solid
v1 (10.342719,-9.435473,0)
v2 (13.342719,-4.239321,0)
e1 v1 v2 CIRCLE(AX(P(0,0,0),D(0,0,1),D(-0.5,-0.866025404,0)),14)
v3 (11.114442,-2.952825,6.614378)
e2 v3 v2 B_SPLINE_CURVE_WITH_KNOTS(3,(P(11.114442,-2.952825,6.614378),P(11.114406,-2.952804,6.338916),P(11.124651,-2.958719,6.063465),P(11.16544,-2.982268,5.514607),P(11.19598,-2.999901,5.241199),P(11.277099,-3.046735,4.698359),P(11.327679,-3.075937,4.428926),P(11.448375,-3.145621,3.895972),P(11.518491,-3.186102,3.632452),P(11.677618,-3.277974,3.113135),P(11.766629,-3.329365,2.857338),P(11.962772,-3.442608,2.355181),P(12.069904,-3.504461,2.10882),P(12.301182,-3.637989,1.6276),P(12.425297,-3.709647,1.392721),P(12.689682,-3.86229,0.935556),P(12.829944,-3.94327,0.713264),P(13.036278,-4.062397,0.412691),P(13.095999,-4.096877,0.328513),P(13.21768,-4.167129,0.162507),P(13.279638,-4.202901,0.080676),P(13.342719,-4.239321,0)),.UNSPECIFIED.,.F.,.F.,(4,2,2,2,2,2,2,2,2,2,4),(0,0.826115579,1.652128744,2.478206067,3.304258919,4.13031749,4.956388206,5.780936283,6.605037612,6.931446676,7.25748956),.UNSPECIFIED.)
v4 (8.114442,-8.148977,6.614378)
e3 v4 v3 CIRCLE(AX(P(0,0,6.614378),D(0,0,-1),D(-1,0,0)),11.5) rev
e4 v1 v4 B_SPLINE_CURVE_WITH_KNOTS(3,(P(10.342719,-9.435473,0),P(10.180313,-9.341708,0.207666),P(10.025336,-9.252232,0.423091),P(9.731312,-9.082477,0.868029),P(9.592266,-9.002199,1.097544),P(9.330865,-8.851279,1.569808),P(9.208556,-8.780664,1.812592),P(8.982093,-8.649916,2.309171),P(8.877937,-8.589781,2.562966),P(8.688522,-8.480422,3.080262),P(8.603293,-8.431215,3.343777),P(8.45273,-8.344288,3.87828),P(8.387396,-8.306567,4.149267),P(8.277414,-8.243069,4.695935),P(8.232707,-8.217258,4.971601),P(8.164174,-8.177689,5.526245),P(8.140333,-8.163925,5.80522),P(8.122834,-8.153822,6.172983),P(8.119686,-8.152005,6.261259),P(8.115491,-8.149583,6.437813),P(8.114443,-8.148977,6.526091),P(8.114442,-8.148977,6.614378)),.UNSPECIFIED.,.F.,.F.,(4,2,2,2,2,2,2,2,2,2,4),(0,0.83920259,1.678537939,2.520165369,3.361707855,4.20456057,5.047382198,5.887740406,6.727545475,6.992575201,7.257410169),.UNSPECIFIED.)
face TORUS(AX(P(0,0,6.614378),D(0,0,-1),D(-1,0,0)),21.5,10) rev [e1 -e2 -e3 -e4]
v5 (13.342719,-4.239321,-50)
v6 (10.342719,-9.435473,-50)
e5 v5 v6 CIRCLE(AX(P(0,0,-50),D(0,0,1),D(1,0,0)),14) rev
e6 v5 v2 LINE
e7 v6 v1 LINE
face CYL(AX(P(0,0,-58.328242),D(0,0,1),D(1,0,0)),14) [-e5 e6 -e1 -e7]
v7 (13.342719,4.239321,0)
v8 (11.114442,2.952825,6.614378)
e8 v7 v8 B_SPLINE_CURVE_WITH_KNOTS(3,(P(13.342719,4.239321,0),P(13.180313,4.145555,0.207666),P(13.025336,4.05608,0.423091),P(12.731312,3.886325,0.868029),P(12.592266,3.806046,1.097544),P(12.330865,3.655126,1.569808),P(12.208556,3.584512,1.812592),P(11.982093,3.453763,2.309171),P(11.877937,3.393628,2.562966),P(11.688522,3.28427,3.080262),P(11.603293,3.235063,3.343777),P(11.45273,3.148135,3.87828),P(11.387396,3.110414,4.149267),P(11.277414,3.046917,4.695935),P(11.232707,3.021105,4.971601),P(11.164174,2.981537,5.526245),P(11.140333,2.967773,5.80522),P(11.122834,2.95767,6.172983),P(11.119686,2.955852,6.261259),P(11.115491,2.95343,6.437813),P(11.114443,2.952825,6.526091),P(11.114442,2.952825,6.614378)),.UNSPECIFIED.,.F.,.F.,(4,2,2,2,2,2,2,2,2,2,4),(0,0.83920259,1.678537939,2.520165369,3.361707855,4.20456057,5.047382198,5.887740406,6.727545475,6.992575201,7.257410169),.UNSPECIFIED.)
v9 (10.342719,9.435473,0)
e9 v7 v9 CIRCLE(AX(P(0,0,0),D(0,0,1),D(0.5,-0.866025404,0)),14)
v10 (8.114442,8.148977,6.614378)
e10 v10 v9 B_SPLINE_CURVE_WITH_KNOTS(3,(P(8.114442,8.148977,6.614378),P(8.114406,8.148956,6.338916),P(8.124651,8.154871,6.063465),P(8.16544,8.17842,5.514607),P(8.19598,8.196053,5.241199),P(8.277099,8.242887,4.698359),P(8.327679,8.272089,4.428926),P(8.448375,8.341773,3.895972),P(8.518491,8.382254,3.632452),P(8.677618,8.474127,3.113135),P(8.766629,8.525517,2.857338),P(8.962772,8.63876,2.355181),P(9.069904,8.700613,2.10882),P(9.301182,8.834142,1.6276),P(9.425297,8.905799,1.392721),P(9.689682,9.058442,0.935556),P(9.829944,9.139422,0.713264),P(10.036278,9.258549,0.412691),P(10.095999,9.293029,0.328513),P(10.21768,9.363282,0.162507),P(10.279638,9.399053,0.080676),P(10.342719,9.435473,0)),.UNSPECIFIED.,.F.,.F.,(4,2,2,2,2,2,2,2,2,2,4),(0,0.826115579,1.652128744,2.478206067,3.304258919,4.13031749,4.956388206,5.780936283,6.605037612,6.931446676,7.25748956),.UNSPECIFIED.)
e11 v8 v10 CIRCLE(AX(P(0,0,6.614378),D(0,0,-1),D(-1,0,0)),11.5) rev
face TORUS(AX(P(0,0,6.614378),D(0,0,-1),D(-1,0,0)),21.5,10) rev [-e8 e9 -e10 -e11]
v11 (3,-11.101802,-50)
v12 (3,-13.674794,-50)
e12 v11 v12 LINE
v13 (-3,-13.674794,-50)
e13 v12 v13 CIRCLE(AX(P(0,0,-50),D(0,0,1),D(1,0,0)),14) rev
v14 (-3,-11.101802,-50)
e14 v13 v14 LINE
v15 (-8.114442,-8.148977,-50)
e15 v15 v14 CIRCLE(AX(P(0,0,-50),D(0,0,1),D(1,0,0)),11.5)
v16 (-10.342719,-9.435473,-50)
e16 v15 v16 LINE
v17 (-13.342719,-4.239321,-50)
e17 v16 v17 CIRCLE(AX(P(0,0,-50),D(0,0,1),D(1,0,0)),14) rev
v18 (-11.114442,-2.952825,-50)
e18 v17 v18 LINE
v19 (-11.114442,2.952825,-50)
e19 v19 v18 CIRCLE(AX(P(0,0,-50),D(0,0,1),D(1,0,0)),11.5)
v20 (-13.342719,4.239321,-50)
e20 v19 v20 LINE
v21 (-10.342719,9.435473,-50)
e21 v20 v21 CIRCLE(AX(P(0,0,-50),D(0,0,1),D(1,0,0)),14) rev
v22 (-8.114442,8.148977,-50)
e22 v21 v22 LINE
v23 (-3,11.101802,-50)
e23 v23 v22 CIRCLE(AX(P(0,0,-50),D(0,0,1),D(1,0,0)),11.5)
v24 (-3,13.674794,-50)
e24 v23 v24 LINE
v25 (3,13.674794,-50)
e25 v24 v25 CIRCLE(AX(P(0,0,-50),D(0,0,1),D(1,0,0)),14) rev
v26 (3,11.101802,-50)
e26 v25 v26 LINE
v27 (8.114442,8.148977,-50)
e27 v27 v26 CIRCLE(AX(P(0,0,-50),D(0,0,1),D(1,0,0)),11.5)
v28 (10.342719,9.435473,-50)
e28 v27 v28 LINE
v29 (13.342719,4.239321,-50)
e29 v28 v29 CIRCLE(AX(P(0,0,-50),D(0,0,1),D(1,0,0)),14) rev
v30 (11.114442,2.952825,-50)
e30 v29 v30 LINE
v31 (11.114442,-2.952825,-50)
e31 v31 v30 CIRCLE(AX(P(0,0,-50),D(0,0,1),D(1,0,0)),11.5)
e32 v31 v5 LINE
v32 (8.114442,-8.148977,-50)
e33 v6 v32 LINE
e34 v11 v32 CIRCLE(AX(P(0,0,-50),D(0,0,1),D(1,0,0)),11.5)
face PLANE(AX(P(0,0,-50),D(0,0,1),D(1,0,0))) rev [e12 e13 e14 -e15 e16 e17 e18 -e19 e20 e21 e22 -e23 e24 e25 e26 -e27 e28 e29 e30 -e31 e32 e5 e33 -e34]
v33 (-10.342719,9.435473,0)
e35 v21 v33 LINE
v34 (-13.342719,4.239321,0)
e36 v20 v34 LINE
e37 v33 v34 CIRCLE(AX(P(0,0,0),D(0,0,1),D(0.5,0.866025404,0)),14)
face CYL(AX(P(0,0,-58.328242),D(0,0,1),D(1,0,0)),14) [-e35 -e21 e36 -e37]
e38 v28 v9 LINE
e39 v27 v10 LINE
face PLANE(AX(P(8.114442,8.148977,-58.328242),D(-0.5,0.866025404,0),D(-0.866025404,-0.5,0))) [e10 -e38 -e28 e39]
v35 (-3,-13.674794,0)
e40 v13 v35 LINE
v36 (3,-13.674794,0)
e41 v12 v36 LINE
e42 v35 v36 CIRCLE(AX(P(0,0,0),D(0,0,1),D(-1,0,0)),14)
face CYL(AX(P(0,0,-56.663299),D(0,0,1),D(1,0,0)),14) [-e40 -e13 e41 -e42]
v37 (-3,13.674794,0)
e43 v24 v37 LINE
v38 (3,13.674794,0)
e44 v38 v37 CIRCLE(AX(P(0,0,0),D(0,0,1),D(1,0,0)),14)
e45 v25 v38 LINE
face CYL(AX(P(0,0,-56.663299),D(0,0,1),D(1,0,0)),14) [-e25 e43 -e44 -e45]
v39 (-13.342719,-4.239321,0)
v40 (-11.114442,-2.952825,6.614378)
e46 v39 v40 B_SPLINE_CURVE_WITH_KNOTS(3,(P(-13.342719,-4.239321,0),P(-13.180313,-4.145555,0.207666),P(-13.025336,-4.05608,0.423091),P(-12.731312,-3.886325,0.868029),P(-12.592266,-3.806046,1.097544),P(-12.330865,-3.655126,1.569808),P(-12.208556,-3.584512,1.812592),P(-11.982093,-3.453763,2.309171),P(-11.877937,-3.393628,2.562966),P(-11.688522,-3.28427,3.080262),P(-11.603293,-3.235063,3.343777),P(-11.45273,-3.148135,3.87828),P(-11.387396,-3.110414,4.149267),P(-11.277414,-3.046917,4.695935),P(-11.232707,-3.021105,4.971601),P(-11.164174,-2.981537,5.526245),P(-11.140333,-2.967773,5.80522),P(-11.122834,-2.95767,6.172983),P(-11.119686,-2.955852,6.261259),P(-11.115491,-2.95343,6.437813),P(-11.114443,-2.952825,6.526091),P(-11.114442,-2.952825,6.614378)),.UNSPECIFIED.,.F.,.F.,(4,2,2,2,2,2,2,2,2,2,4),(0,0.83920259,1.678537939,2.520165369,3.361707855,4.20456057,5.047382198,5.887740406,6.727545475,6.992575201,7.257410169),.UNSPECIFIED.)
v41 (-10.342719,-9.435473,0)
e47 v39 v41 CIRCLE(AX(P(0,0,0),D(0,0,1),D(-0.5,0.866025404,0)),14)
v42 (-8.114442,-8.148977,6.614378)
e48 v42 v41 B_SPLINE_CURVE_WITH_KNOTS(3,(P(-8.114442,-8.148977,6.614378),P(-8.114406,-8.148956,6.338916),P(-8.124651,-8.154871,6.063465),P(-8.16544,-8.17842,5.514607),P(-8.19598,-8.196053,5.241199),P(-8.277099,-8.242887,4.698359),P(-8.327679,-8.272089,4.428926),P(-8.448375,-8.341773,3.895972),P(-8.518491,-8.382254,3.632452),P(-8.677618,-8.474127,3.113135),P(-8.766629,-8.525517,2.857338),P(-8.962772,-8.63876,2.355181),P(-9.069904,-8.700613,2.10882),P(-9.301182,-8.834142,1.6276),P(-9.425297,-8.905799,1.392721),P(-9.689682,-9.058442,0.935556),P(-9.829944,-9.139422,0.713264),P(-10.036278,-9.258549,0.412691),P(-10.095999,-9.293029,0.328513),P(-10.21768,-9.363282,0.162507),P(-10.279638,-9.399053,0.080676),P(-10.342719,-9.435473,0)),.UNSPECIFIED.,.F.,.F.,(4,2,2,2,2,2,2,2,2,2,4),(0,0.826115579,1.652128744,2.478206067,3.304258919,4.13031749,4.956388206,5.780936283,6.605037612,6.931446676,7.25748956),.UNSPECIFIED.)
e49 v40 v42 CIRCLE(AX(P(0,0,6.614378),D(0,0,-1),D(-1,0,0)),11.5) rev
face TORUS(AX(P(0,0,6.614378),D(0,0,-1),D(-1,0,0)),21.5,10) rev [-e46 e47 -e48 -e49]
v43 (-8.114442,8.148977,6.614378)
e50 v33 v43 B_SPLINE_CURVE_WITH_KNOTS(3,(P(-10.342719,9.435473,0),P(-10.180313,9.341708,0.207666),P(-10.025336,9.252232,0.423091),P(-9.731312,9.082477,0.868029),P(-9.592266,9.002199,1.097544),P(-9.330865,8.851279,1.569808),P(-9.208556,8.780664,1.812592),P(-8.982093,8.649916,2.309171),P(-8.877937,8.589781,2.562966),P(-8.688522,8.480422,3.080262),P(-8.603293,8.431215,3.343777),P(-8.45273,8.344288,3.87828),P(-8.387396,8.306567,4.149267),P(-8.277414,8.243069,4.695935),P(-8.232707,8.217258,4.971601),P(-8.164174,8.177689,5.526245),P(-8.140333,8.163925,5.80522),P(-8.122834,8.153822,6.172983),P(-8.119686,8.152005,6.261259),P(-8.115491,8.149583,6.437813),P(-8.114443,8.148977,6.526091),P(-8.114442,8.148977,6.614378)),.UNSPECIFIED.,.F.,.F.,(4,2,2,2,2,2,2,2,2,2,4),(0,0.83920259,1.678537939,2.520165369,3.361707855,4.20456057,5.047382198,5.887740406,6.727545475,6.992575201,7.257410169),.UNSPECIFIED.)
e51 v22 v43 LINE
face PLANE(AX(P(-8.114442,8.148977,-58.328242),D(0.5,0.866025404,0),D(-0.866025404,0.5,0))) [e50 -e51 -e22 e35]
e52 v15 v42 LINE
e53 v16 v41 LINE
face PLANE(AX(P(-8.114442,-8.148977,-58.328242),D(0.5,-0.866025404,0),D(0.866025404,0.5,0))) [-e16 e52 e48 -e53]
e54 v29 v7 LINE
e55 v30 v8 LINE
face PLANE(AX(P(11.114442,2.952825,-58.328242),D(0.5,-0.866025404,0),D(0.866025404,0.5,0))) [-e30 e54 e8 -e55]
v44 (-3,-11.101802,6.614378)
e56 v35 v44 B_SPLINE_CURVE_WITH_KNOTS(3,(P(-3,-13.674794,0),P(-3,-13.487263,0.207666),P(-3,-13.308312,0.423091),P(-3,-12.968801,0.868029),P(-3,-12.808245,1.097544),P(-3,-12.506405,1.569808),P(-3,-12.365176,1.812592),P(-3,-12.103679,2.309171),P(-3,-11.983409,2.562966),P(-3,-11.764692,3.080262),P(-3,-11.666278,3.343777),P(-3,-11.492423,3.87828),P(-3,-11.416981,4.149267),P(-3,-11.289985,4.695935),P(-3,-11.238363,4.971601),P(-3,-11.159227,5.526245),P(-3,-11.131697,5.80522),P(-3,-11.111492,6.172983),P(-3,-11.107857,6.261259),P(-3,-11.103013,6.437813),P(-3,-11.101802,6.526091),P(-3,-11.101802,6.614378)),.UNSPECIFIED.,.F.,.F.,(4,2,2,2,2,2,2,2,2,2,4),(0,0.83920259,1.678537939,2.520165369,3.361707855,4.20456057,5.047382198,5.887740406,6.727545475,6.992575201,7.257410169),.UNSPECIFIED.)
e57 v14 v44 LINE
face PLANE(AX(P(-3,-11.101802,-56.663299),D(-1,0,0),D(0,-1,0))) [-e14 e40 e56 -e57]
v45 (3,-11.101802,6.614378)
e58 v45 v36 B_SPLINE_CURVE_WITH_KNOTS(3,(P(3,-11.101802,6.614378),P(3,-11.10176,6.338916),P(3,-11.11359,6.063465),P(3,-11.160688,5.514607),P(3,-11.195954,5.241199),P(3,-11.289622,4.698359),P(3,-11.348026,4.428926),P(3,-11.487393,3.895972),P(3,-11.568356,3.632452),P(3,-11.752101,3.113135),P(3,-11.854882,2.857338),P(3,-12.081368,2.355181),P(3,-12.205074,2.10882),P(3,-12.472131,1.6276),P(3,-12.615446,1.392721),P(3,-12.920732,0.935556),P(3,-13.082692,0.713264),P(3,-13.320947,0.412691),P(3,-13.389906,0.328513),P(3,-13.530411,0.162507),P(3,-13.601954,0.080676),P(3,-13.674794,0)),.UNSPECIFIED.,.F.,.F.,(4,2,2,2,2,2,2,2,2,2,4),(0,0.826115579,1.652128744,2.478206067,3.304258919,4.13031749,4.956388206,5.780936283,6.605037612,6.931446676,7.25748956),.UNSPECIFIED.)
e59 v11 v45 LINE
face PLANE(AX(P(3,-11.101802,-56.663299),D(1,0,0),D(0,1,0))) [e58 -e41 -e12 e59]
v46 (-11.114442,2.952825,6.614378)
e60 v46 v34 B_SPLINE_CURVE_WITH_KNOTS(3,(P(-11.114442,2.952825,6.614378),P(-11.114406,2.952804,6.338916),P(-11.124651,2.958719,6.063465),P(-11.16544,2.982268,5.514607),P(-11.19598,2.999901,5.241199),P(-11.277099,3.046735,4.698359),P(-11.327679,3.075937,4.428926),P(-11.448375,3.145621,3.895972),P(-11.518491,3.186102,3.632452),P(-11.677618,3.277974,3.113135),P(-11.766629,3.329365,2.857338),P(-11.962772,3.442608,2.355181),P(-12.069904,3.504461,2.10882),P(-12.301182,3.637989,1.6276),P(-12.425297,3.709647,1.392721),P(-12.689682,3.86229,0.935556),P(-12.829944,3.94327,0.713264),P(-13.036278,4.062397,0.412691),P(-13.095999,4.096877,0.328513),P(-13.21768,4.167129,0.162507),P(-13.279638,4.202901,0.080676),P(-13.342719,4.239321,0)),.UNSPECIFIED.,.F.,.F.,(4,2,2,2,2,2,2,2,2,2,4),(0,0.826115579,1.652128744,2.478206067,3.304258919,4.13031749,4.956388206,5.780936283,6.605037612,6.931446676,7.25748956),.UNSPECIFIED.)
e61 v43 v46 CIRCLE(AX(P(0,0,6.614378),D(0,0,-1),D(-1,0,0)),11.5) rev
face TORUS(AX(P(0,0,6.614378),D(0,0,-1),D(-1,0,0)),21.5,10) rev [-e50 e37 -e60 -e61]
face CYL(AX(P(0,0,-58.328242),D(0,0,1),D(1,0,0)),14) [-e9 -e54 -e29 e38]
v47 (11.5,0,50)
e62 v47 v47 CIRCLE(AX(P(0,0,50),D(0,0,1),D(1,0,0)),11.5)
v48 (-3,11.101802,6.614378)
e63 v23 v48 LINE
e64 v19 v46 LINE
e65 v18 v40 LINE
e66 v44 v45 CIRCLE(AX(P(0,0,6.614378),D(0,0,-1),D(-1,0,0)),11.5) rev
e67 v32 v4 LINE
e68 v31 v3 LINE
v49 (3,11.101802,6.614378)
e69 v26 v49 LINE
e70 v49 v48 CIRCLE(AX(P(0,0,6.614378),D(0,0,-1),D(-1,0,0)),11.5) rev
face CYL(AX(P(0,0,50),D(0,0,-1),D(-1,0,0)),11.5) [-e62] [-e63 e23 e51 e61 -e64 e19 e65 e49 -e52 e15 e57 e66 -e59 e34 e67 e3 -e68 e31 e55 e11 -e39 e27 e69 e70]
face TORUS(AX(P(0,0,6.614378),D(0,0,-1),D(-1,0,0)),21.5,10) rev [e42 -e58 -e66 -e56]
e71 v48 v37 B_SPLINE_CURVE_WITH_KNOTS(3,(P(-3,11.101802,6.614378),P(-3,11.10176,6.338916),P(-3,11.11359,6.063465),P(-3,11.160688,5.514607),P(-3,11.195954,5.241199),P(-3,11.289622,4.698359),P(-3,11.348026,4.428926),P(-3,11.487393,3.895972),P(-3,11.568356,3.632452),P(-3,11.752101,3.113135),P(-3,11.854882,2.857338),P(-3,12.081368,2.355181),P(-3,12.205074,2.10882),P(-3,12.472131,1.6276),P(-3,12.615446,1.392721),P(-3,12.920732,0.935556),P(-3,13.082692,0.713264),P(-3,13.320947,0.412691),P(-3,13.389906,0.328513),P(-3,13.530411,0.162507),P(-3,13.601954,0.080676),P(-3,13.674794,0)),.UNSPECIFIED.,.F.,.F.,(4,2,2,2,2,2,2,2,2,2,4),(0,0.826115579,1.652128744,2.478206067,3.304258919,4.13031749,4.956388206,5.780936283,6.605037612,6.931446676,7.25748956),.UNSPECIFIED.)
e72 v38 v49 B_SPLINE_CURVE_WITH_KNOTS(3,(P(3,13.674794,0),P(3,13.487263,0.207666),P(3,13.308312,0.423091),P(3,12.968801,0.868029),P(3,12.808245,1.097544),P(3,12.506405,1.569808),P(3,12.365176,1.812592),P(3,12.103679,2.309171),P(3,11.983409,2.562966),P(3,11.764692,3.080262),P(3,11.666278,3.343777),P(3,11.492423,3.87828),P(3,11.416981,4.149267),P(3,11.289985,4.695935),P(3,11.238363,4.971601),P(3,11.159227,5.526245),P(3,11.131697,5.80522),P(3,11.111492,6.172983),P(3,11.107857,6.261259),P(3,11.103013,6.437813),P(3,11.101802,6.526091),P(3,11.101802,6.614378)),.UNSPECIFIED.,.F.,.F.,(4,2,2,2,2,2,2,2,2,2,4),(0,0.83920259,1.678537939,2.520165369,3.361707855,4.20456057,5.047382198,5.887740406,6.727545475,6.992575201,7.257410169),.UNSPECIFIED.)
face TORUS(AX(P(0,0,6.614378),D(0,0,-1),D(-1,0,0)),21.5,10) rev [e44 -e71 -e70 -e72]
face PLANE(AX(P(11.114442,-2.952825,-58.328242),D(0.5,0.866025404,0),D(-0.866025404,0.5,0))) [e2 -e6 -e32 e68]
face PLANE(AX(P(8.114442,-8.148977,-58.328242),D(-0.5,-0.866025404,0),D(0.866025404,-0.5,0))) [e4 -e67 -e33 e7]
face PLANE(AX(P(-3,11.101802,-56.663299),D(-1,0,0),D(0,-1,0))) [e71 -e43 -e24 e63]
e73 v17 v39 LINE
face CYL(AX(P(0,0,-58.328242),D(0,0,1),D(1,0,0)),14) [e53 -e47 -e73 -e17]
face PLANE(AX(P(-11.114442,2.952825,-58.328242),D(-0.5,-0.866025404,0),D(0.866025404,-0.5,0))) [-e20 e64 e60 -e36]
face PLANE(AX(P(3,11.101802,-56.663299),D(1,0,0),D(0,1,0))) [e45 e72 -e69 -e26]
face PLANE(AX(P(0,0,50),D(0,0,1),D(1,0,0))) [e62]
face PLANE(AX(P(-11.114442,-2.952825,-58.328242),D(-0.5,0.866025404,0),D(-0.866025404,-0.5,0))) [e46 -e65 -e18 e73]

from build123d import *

# Parameters (mm, degrees)
SKETCH1_R           = 11.5
SHAFT_DEPTH         = 50
BOSS_EXTRUDE2_DEPTH = 50
FILLET1_R           = 10
CIRPATTERN1_START   = -50
CIRPATTERN1_DEPTH   = 56.614378378


with BuildPart() as part:
    # Sketch1 → Shaft (new, symmetric)
    with BuildSketch(Plane.XY):
        Circle(SKETCH1_R)
    extrude(amount=SHAFT_DEPTH, both=True)

    # Sketch2 → Boss-Extrude2 (add)
    with BuildSketch(Plane.XY):
        with BuildLine():
            Line((3, 11.101801656), (3, 13.674794331))
            ThreePointArc((3, 13.674794331), (0, 14), (-3, 13.674794331))
            Line((-3, 13.674794331), (-3, 11.101801656))
            ThreePointArc((-3, 11.101801656), (0, 11.5), (3, 11.101801656))
        make_face()
    extrude(amount=-BOSS_EXTRUDE2_DEPTH)

    # Fillet1
    # the kernel refuses this fillet: 10 mm, written as the material it adds along each edge
    with BuildSketch(Plane(origin=(0, 0, 0), x_dir=(-0.9914186895468253, -0.13072483320798547, 0), z_dir=(0.13072483320798547, -0.9914186895468253, 0))) as fillet1_piece_1_section:
        with BuildLine():
            CenterArc((21.5, -6.614378278), FILLET1_R, 138.590377891, 41.409622109)
            Line((14, 0), (13.85, 0.132287566))
            ThreePointArc((13.85, 0.132287566), (12.75, 0.2), (11.5, 0.2))
            Line((11.5, 0.2), (11.3, 0))
            Line((11.3, 0), (11.3, -6.614378278))
            Line((11.3, -6.614378278), (11.5, -6.614378278))
        make_face()
    fillet1_piece_1 = revolve(axis=Axis((0, 0, 0), (0, 0, -1)), revolution_arc=195.022959301, mode=Mode.PRIVATE)
    fillet1_piece_1 = split(fillet1_piece_1, bisect_by=Plane(origin=(-3, 0, 0), z_dir=(1, 0, 0)), keep=Keep.TOP, mode=Mode.PRIVATE)
    fillet1_piece_1 = split(fillet1_piece_1, bisect_by=Plane(origin=(3, 0, 0), z_dir=(-1, 0, 0)), keep=Keep.TOP, mode=Mode.PRIVATE)
    add(fillet1_piece_1)

    # CirPattern1: read off the stored shape, not the designer's step
    # CirPattern1 outline → CirPattern1 (add)
    with BuildSketch(Plane.XY.offset(CIRPATTERN1_START)):
        with BuildLine():
            Line((11.114442262, 2.952824616), (13.342719282, 4.239320954))
            ThreePointArc((13.342719282, 4.239320954), (12.124355653, 7), (10.342719282, 9.435473377))
            Line((10.342719282, 9.435473377), (8.114442262, 8.148977039))
            ThreePointArc((8.114442262, 8.148977039), (9.959292144, 5.75), (11.114442262, 2.952824616))
        make_face()
        with BuildLine():
            ThreePointArc((-11.114442262, 2.952824616), (-9.959292144, 5.75), (-8.114442262, 8.148977039))
            Line((-8.114442262, 8.148977039), (-10.342719282, 9.435473377))
            ThreePointArc((-10.342719282, 9.435473377), (-12.124355653, 7), (-13.342719282, 4.239320954))
            Line((-13.342719282, 4.239320954), (-11.114442262, 2.952824616))
        make_face()
        with BuildLine():
            Line((13.342719282, -4.239320954), (11.114442262, -2.952824616))
            ThreePointArc((11.114442262, -2.952824616), (9.959292144, -5.75), (8.114442262, -8.148977039))
            Line((8.114442262, -8.148977039), (10.342719282, -9.435473377))
            ThreePointArc((10.342719282, -9.435473377), (12.124355653, -7), (13.342719282, -4.239320954))
        make_face()
        with BuildLine():
            ThreePointArc((-8.114442262, -8.148977039), (-9.959292144, -5.75), (-11.114442262, -2.952824616))
            Line((-11.114442262, -2.952824616), (-13.342719282, -4.239320954))
            ThreePointArc((-13.342719282, -4.239320954), (-12.124355653, -7), (-10.342719282, -9.435473377))
            Line((-10.342719282, -9.435473377), (-8.114442262, -8.148977039))
        make_face()
        with BuildLine():
            Line((3, -13.674794331), (3, -11.101801656))
            ThreePointArc((3, -11.101801656), (0, -11.5), (-3, -11.101801656))
            Line((-3, -11.101801656), (-3, -13.674794331))
            ThreePointArc((-3, -13.674794331), (0, -14), (3, -13.674794331))
        make_face()
    extrude(amount=CIRPATTERN1_DEPTH)

    # CirPattern1 2 outline → CirPattern1 2 (revolve, cut)
    with BuildSketch(Plane.XZ):
        with BuildLine():
            ThreePointArc((11.5, 6.614378278), (12.145856533, 3.078844372), (14, 0))
            Line((14, 0), (14, 6.614378378))
            Line((14, 6.614378378), (11.5, 6.614378278))
        make_face()
    revolve(axis=Axis((0, 0, 0), (0, 0, 1)), mode=Mode.SUBTRACT)


solid = part.part
